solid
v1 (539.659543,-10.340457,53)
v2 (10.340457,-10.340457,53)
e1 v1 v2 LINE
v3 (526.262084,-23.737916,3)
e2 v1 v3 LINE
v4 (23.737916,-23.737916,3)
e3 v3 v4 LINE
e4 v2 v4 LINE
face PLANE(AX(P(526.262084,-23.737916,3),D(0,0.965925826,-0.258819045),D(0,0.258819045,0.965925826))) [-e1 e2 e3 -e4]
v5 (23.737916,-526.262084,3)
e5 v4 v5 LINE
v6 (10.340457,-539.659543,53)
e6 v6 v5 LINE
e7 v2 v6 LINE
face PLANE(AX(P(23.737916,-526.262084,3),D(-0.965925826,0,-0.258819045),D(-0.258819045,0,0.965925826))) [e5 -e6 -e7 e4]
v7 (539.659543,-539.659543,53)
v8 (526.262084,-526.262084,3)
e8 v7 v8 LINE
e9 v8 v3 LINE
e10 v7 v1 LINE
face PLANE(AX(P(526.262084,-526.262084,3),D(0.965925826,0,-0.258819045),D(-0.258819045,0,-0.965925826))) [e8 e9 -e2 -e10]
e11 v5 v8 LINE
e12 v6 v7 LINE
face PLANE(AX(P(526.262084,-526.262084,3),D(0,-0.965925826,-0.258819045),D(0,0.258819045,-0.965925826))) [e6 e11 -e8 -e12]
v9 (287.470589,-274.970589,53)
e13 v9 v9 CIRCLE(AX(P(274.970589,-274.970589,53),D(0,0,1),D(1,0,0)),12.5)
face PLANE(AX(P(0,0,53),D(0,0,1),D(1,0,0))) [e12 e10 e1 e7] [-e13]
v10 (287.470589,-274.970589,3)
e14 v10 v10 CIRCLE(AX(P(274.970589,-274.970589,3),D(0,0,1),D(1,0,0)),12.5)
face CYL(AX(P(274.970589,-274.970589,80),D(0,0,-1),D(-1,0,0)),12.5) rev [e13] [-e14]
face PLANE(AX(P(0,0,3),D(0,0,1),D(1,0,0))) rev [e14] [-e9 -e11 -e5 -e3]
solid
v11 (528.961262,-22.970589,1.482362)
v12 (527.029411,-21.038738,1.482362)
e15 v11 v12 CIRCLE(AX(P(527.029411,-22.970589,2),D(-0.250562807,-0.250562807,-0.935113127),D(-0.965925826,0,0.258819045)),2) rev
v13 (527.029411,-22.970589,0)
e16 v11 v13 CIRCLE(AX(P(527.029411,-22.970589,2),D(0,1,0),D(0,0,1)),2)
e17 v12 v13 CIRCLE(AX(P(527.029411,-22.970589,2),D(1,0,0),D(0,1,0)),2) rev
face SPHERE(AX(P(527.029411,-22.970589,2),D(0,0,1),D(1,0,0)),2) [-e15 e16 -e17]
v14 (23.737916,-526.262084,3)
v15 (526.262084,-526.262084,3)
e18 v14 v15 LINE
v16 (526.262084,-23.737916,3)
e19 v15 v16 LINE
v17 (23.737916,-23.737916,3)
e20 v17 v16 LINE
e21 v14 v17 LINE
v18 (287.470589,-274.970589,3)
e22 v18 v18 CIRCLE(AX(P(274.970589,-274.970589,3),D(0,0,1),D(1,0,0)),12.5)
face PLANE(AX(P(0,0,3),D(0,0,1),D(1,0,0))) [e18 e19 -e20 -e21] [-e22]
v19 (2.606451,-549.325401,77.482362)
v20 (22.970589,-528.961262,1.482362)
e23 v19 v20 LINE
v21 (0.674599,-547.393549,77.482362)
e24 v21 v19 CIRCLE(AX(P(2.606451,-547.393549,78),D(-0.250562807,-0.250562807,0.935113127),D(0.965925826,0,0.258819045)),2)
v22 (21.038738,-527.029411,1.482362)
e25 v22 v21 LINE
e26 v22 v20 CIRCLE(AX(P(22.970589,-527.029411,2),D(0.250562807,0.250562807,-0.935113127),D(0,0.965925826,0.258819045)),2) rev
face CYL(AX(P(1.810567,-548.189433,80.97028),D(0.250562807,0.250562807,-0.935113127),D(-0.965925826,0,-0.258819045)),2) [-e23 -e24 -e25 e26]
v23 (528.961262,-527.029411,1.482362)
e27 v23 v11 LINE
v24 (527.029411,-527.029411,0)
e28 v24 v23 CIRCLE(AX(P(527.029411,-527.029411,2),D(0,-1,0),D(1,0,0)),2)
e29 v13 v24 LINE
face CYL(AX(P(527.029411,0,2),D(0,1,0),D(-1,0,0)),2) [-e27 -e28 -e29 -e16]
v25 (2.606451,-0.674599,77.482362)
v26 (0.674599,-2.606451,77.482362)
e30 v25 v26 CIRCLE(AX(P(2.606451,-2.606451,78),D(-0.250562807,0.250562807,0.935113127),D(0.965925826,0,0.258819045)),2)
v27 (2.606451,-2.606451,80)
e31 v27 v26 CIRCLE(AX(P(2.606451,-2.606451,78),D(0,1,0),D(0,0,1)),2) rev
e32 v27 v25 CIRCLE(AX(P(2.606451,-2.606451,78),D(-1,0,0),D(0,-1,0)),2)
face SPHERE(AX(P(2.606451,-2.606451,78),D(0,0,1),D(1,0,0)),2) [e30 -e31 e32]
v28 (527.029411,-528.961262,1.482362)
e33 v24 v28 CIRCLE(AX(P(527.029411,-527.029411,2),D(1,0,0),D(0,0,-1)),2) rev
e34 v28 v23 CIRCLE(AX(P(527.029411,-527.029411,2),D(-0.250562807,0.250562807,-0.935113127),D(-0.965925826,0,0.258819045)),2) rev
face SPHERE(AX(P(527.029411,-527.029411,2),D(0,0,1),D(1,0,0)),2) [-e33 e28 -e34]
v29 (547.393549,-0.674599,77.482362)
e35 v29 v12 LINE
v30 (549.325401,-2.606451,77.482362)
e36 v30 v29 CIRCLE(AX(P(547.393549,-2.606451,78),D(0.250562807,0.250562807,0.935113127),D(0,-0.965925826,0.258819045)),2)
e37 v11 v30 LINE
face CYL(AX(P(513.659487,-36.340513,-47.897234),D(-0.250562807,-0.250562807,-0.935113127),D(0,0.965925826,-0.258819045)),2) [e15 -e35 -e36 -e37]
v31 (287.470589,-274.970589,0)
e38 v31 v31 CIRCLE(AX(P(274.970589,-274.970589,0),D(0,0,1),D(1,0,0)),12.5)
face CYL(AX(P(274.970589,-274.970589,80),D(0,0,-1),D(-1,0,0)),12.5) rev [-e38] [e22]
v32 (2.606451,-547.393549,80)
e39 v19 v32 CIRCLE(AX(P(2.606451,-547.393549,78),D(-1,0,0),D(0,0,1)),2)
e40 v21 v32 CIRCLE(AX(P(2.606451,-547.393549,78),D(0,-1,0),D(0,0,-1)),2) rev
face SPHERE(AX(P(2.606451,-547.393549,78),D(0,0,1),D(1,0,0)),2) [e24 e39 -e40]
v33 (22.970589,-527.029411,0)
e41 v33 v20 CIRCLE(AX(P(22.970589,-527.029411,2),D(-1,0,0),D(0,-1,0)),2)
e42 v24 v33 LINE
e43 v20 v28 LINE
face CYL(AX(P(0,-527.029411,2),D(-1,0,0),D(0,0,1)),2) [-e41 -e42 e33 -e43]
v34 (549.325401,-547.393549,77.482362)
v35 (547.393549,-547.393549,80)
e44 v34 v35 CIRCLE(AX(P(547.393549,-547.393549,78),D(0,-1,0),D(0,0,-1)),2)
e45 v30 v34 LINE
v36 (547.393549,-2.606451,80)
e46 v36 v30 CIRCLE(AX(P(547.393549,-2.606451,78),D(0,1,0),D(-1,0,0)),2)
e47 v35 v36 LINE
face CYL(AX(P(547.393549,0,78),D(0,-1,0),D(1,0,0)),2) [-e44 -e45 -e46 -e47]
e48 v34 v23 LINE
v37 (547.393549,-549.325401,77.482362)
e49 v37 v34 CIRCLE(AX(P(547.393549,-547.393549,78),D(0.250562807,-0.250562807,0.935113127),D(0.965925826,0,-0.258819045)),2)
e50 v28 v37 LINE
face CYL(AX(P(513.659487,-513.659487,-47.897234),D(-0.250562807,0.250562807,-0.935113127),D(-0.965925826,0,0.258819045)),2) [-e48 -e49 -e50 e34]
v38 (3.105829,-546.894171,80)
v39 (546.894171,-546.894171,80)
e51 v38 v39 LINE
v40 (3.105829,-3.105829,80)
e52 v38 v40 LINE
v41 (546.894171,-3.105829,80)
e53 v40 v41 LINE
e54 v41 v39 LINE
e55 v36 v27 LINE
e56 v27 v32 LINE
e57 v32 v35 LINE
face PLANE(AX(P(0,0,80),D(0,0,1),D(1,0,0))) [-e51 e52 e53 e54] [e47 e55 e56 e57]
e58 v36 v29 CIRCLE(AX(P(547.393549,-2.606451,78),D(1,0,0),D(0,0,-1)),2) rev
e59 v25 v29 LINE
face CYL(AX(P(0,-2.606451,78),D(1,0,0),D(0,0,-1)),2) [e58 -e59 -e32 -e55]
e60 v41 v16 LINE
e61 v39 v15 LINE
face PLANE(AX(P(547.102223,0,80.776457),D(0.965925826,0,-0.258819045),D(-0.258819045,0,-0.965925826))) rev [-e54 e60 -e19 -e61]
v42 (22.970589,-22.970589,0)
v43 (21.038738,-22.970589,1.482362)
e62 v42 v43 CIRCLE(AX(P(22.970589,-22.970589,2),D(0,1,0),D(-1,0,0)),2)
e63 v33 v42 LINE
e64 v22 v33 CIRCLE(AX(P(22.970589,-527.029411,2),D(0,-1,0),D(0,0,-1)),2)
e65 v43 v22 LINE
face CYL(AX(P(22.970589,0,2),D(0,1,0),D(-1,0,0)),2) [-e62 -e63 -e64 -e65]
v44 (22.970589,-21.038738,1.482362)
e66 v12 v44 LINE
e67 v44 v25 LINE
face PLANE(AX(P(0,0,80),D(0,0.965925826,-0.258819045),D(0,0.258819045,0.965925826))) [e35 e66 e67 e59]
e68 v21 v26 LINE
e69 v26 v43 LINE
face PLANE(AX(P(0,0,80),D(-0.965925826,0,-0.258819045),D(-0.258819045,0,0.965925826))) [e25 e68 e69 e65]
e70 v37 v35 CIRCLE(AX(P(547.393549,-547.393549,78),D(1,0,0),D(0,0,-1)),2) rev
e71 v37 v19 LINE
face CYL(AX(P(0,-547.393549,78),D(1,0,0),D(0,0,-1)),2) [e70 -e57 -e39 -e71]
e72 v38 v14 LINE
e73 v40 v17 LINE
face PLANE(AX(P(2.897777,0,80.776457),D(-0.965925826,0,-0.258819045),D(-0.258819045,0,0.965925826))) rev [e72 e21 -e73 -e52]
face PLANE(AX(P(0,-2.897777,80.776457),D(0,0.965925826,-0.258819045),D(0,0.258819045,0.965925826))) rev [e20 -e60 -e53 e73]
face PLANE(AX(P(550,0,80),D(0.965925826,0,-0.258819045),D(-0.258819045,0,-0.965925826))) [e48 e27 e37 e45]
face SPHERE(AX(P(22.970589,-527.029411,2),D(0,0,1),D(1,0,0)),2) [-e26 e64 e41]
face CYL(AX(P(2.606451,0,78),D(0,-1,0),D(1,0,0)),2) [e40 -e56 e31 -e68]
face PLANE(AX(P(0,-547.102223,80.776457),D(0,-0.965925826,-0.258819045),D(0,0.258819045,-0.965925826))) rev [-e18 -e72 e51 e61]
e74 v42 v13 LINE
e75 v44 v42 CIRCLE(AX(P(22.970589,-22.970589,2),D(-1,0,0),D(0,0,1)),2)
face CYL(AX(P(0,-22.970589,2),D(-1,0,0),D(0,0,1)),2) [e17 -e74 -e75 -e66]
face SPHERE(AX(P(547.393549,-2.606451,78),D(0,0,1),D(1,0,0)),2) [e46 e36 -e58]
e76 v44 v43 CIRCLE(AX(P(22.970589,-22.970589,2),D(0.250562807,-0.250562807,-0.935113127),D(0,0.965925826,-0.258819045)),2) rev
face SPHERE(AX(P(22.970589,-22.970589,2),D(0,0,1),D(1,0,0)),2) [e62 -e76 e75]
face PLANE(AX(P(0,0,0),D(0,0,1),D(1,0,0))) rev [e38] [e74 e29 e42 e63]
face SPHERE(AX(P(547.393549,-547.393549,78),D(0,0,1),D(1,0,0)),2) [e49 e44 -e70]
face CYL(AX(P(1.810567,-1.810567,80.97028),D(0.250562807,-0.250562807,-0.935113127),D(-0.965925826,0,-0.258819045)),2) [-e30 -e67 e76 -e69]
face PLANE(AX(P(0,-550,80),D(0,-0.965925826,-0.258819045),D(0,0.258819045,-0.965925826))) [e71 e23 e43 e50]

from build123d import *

# Parameters (mm, degrees)
SKETCH_1_W               = 550
SKETCH_1_H               = 550
EXTRUDE_1_DEPTH          = 80
DRAFT_3_ANGLE            = -15
FILLET_1_R               = 2
SHELL_8_OUTLINE_W        = 502.524167284
SHELL_8_OUTLINE_H        = 502.524167284
SHELL_8_DEPTH            = 77
SHELL_8_DRAFT            = -15
SKETCH_4_W               = 502.524167284
SKETCH_4_H               = 502.524167284
EXTRUDE_3_DEPTH          = 50
EXTRUDE_3_DRAFT          = -15
CUT_EXTRUDE_1_DEPTH      = 782.067566811
CUT_EXTRUDE_1_DEPTH_BACK = 782.067566811
SKETCH_5_R               = 12.5


# Read off the part's stored shape, not the designer's step: 쉘8
with BuildPart() as part:
    # 스케치1 → 보스-돌출1 (new body)
    with BuildSketch(Plane.XY):
        with Locations((275, -275)):
            Rectangle(SKETCH_1_W, SKETCH_1_H)
    extrude(amount=EXTRUDE_1_DEPTH)

    # 구배3
    draft_3_faces = [part.faces().sort_by_distance(p)[0] for p in [
        (550, -275, 40),
        (275, -550, 40),
        (0, -275, 40),
        (275, 0, 40),
    ]]
    draft(draft_3_faces, Plane.XY.offset(80), DRAFT_3_ANGLE)

    # 필렛1
    fillet_1_edges = [part.edges().sort_by_distance(p)[0] for p in [
        (550, -275, 80),
        (275, 0, 80),
        (0, -275, 80),
        (275, -21.435935394, 0),
        (528.564064606, -275, 0),
        (275, -528.564064606, 0),
        (21.435935394, -275, 0),
        (275, -550, 80),
        (10.717967697, -10.717967697, 40),
        (539.282032303, -10.717967697, 40),
        (539.282032303, -539.282032303, 40),
        (10.717967697, -539.282032303, 40),
    ]]
    fillet(fillet_1_edges, radius=FILLET_1_R)


with BuildPart() as shell_8_tool:
    # 쉘8 outline → 쉘8 (with draft: the straight prism first)
    with BuildSketch(Plane.XY.offset(3)):
        with Locations((275, -275)):
            Rectangle(SHELL_8_OUTLINE_W, SHELL_8_OUTLINE_H)
    extrude(amount=SHELL_8_DEPTH)
    # 쉘8: the draft: its side faces are tilted about the plane it starts from
    shell_8_sides = [shell_8_tool.faces().sort_by_distance(p)[0] for p in [
        (275, -526.262083642, 41.5),
        (526.262083642, -275, 41.5),
        (275, -23.737916358, 41.5),
        (23.737916358, -275, 41.5),
    ]]
    draft(shell_8_sides, Plane.XY.offset(3), SHELL_8_DRAFT)


with BuildPart() as part_1:
    add(part.part)

    # 쉘8: cut by shell_8_tool
    add(shell_8_tool.part, mode=Mode.SUBTRACT)


with BuildPart() as body_2:
    # 스케치4 → 보스-돌출3 (with draft: the straight prism first)
    with BuildSketch(Plane.XY.offset(3)):
        with Locations((275, -275)):
            Rectangle(SKETCH_4_W, SKETCH_4_H)
    extrude(amount=EXTRUDE_3_DEPTH)
    # 보스-돌출3: the draft: its side faces are tilted about the plane it starts from
    extrude_3_sides = [body_2.faces().sort_by_distance(p)[0] for p in [
        (526.262083642, -275, 28),
        (275, -23.737916358, 28),
        (23.737916358, -275, 28),
        (275, -526.262083642, 28),
    ]]
    draft(extrude_3_sides, Plane.XY.offset(3), EXTRUDE_3_DRAFT)


with BuildPart() as cut_extrude_1_tool:
    # 스케치5 → 컷-돌출1 (new, two sides: drawn at the far end of the back side and taken through both)
    with BuildSketch(Plane(origin=(0, 0, 0), x_dir=(-1, 0, 0), z_dir=(0, 0, -1)).offset(-CUT_EXTRUDE_1_DEPTH_BACK)):
        with Locations(Location((-274.97058937, -274.97058937, 0), (0, 0, 180))):
            Circle(SKETCH_5_R)
    extrude(amount=CUT_EXTRUDE_1_DEPTH + CUT_EXTRUDE_1_DEPTH_BACK)


with BuildPart() as part_2:
    add(part_1.part)

    # 컷-돌출1: cut by cut_extrude_1_tool
    add(cut_extrude_1_tool.part, mode=Mode.SUBTRACT)


with BuildPart() as body_2_1:
    add(body_2.part)

    # 컷-돌출1: cut by cut_extrude_1_tool
    add(cut_extrude_1_tool.part, mode=Mode.SUBTRACT)


solid = Compound([part_2.part, body_2_1.part])
